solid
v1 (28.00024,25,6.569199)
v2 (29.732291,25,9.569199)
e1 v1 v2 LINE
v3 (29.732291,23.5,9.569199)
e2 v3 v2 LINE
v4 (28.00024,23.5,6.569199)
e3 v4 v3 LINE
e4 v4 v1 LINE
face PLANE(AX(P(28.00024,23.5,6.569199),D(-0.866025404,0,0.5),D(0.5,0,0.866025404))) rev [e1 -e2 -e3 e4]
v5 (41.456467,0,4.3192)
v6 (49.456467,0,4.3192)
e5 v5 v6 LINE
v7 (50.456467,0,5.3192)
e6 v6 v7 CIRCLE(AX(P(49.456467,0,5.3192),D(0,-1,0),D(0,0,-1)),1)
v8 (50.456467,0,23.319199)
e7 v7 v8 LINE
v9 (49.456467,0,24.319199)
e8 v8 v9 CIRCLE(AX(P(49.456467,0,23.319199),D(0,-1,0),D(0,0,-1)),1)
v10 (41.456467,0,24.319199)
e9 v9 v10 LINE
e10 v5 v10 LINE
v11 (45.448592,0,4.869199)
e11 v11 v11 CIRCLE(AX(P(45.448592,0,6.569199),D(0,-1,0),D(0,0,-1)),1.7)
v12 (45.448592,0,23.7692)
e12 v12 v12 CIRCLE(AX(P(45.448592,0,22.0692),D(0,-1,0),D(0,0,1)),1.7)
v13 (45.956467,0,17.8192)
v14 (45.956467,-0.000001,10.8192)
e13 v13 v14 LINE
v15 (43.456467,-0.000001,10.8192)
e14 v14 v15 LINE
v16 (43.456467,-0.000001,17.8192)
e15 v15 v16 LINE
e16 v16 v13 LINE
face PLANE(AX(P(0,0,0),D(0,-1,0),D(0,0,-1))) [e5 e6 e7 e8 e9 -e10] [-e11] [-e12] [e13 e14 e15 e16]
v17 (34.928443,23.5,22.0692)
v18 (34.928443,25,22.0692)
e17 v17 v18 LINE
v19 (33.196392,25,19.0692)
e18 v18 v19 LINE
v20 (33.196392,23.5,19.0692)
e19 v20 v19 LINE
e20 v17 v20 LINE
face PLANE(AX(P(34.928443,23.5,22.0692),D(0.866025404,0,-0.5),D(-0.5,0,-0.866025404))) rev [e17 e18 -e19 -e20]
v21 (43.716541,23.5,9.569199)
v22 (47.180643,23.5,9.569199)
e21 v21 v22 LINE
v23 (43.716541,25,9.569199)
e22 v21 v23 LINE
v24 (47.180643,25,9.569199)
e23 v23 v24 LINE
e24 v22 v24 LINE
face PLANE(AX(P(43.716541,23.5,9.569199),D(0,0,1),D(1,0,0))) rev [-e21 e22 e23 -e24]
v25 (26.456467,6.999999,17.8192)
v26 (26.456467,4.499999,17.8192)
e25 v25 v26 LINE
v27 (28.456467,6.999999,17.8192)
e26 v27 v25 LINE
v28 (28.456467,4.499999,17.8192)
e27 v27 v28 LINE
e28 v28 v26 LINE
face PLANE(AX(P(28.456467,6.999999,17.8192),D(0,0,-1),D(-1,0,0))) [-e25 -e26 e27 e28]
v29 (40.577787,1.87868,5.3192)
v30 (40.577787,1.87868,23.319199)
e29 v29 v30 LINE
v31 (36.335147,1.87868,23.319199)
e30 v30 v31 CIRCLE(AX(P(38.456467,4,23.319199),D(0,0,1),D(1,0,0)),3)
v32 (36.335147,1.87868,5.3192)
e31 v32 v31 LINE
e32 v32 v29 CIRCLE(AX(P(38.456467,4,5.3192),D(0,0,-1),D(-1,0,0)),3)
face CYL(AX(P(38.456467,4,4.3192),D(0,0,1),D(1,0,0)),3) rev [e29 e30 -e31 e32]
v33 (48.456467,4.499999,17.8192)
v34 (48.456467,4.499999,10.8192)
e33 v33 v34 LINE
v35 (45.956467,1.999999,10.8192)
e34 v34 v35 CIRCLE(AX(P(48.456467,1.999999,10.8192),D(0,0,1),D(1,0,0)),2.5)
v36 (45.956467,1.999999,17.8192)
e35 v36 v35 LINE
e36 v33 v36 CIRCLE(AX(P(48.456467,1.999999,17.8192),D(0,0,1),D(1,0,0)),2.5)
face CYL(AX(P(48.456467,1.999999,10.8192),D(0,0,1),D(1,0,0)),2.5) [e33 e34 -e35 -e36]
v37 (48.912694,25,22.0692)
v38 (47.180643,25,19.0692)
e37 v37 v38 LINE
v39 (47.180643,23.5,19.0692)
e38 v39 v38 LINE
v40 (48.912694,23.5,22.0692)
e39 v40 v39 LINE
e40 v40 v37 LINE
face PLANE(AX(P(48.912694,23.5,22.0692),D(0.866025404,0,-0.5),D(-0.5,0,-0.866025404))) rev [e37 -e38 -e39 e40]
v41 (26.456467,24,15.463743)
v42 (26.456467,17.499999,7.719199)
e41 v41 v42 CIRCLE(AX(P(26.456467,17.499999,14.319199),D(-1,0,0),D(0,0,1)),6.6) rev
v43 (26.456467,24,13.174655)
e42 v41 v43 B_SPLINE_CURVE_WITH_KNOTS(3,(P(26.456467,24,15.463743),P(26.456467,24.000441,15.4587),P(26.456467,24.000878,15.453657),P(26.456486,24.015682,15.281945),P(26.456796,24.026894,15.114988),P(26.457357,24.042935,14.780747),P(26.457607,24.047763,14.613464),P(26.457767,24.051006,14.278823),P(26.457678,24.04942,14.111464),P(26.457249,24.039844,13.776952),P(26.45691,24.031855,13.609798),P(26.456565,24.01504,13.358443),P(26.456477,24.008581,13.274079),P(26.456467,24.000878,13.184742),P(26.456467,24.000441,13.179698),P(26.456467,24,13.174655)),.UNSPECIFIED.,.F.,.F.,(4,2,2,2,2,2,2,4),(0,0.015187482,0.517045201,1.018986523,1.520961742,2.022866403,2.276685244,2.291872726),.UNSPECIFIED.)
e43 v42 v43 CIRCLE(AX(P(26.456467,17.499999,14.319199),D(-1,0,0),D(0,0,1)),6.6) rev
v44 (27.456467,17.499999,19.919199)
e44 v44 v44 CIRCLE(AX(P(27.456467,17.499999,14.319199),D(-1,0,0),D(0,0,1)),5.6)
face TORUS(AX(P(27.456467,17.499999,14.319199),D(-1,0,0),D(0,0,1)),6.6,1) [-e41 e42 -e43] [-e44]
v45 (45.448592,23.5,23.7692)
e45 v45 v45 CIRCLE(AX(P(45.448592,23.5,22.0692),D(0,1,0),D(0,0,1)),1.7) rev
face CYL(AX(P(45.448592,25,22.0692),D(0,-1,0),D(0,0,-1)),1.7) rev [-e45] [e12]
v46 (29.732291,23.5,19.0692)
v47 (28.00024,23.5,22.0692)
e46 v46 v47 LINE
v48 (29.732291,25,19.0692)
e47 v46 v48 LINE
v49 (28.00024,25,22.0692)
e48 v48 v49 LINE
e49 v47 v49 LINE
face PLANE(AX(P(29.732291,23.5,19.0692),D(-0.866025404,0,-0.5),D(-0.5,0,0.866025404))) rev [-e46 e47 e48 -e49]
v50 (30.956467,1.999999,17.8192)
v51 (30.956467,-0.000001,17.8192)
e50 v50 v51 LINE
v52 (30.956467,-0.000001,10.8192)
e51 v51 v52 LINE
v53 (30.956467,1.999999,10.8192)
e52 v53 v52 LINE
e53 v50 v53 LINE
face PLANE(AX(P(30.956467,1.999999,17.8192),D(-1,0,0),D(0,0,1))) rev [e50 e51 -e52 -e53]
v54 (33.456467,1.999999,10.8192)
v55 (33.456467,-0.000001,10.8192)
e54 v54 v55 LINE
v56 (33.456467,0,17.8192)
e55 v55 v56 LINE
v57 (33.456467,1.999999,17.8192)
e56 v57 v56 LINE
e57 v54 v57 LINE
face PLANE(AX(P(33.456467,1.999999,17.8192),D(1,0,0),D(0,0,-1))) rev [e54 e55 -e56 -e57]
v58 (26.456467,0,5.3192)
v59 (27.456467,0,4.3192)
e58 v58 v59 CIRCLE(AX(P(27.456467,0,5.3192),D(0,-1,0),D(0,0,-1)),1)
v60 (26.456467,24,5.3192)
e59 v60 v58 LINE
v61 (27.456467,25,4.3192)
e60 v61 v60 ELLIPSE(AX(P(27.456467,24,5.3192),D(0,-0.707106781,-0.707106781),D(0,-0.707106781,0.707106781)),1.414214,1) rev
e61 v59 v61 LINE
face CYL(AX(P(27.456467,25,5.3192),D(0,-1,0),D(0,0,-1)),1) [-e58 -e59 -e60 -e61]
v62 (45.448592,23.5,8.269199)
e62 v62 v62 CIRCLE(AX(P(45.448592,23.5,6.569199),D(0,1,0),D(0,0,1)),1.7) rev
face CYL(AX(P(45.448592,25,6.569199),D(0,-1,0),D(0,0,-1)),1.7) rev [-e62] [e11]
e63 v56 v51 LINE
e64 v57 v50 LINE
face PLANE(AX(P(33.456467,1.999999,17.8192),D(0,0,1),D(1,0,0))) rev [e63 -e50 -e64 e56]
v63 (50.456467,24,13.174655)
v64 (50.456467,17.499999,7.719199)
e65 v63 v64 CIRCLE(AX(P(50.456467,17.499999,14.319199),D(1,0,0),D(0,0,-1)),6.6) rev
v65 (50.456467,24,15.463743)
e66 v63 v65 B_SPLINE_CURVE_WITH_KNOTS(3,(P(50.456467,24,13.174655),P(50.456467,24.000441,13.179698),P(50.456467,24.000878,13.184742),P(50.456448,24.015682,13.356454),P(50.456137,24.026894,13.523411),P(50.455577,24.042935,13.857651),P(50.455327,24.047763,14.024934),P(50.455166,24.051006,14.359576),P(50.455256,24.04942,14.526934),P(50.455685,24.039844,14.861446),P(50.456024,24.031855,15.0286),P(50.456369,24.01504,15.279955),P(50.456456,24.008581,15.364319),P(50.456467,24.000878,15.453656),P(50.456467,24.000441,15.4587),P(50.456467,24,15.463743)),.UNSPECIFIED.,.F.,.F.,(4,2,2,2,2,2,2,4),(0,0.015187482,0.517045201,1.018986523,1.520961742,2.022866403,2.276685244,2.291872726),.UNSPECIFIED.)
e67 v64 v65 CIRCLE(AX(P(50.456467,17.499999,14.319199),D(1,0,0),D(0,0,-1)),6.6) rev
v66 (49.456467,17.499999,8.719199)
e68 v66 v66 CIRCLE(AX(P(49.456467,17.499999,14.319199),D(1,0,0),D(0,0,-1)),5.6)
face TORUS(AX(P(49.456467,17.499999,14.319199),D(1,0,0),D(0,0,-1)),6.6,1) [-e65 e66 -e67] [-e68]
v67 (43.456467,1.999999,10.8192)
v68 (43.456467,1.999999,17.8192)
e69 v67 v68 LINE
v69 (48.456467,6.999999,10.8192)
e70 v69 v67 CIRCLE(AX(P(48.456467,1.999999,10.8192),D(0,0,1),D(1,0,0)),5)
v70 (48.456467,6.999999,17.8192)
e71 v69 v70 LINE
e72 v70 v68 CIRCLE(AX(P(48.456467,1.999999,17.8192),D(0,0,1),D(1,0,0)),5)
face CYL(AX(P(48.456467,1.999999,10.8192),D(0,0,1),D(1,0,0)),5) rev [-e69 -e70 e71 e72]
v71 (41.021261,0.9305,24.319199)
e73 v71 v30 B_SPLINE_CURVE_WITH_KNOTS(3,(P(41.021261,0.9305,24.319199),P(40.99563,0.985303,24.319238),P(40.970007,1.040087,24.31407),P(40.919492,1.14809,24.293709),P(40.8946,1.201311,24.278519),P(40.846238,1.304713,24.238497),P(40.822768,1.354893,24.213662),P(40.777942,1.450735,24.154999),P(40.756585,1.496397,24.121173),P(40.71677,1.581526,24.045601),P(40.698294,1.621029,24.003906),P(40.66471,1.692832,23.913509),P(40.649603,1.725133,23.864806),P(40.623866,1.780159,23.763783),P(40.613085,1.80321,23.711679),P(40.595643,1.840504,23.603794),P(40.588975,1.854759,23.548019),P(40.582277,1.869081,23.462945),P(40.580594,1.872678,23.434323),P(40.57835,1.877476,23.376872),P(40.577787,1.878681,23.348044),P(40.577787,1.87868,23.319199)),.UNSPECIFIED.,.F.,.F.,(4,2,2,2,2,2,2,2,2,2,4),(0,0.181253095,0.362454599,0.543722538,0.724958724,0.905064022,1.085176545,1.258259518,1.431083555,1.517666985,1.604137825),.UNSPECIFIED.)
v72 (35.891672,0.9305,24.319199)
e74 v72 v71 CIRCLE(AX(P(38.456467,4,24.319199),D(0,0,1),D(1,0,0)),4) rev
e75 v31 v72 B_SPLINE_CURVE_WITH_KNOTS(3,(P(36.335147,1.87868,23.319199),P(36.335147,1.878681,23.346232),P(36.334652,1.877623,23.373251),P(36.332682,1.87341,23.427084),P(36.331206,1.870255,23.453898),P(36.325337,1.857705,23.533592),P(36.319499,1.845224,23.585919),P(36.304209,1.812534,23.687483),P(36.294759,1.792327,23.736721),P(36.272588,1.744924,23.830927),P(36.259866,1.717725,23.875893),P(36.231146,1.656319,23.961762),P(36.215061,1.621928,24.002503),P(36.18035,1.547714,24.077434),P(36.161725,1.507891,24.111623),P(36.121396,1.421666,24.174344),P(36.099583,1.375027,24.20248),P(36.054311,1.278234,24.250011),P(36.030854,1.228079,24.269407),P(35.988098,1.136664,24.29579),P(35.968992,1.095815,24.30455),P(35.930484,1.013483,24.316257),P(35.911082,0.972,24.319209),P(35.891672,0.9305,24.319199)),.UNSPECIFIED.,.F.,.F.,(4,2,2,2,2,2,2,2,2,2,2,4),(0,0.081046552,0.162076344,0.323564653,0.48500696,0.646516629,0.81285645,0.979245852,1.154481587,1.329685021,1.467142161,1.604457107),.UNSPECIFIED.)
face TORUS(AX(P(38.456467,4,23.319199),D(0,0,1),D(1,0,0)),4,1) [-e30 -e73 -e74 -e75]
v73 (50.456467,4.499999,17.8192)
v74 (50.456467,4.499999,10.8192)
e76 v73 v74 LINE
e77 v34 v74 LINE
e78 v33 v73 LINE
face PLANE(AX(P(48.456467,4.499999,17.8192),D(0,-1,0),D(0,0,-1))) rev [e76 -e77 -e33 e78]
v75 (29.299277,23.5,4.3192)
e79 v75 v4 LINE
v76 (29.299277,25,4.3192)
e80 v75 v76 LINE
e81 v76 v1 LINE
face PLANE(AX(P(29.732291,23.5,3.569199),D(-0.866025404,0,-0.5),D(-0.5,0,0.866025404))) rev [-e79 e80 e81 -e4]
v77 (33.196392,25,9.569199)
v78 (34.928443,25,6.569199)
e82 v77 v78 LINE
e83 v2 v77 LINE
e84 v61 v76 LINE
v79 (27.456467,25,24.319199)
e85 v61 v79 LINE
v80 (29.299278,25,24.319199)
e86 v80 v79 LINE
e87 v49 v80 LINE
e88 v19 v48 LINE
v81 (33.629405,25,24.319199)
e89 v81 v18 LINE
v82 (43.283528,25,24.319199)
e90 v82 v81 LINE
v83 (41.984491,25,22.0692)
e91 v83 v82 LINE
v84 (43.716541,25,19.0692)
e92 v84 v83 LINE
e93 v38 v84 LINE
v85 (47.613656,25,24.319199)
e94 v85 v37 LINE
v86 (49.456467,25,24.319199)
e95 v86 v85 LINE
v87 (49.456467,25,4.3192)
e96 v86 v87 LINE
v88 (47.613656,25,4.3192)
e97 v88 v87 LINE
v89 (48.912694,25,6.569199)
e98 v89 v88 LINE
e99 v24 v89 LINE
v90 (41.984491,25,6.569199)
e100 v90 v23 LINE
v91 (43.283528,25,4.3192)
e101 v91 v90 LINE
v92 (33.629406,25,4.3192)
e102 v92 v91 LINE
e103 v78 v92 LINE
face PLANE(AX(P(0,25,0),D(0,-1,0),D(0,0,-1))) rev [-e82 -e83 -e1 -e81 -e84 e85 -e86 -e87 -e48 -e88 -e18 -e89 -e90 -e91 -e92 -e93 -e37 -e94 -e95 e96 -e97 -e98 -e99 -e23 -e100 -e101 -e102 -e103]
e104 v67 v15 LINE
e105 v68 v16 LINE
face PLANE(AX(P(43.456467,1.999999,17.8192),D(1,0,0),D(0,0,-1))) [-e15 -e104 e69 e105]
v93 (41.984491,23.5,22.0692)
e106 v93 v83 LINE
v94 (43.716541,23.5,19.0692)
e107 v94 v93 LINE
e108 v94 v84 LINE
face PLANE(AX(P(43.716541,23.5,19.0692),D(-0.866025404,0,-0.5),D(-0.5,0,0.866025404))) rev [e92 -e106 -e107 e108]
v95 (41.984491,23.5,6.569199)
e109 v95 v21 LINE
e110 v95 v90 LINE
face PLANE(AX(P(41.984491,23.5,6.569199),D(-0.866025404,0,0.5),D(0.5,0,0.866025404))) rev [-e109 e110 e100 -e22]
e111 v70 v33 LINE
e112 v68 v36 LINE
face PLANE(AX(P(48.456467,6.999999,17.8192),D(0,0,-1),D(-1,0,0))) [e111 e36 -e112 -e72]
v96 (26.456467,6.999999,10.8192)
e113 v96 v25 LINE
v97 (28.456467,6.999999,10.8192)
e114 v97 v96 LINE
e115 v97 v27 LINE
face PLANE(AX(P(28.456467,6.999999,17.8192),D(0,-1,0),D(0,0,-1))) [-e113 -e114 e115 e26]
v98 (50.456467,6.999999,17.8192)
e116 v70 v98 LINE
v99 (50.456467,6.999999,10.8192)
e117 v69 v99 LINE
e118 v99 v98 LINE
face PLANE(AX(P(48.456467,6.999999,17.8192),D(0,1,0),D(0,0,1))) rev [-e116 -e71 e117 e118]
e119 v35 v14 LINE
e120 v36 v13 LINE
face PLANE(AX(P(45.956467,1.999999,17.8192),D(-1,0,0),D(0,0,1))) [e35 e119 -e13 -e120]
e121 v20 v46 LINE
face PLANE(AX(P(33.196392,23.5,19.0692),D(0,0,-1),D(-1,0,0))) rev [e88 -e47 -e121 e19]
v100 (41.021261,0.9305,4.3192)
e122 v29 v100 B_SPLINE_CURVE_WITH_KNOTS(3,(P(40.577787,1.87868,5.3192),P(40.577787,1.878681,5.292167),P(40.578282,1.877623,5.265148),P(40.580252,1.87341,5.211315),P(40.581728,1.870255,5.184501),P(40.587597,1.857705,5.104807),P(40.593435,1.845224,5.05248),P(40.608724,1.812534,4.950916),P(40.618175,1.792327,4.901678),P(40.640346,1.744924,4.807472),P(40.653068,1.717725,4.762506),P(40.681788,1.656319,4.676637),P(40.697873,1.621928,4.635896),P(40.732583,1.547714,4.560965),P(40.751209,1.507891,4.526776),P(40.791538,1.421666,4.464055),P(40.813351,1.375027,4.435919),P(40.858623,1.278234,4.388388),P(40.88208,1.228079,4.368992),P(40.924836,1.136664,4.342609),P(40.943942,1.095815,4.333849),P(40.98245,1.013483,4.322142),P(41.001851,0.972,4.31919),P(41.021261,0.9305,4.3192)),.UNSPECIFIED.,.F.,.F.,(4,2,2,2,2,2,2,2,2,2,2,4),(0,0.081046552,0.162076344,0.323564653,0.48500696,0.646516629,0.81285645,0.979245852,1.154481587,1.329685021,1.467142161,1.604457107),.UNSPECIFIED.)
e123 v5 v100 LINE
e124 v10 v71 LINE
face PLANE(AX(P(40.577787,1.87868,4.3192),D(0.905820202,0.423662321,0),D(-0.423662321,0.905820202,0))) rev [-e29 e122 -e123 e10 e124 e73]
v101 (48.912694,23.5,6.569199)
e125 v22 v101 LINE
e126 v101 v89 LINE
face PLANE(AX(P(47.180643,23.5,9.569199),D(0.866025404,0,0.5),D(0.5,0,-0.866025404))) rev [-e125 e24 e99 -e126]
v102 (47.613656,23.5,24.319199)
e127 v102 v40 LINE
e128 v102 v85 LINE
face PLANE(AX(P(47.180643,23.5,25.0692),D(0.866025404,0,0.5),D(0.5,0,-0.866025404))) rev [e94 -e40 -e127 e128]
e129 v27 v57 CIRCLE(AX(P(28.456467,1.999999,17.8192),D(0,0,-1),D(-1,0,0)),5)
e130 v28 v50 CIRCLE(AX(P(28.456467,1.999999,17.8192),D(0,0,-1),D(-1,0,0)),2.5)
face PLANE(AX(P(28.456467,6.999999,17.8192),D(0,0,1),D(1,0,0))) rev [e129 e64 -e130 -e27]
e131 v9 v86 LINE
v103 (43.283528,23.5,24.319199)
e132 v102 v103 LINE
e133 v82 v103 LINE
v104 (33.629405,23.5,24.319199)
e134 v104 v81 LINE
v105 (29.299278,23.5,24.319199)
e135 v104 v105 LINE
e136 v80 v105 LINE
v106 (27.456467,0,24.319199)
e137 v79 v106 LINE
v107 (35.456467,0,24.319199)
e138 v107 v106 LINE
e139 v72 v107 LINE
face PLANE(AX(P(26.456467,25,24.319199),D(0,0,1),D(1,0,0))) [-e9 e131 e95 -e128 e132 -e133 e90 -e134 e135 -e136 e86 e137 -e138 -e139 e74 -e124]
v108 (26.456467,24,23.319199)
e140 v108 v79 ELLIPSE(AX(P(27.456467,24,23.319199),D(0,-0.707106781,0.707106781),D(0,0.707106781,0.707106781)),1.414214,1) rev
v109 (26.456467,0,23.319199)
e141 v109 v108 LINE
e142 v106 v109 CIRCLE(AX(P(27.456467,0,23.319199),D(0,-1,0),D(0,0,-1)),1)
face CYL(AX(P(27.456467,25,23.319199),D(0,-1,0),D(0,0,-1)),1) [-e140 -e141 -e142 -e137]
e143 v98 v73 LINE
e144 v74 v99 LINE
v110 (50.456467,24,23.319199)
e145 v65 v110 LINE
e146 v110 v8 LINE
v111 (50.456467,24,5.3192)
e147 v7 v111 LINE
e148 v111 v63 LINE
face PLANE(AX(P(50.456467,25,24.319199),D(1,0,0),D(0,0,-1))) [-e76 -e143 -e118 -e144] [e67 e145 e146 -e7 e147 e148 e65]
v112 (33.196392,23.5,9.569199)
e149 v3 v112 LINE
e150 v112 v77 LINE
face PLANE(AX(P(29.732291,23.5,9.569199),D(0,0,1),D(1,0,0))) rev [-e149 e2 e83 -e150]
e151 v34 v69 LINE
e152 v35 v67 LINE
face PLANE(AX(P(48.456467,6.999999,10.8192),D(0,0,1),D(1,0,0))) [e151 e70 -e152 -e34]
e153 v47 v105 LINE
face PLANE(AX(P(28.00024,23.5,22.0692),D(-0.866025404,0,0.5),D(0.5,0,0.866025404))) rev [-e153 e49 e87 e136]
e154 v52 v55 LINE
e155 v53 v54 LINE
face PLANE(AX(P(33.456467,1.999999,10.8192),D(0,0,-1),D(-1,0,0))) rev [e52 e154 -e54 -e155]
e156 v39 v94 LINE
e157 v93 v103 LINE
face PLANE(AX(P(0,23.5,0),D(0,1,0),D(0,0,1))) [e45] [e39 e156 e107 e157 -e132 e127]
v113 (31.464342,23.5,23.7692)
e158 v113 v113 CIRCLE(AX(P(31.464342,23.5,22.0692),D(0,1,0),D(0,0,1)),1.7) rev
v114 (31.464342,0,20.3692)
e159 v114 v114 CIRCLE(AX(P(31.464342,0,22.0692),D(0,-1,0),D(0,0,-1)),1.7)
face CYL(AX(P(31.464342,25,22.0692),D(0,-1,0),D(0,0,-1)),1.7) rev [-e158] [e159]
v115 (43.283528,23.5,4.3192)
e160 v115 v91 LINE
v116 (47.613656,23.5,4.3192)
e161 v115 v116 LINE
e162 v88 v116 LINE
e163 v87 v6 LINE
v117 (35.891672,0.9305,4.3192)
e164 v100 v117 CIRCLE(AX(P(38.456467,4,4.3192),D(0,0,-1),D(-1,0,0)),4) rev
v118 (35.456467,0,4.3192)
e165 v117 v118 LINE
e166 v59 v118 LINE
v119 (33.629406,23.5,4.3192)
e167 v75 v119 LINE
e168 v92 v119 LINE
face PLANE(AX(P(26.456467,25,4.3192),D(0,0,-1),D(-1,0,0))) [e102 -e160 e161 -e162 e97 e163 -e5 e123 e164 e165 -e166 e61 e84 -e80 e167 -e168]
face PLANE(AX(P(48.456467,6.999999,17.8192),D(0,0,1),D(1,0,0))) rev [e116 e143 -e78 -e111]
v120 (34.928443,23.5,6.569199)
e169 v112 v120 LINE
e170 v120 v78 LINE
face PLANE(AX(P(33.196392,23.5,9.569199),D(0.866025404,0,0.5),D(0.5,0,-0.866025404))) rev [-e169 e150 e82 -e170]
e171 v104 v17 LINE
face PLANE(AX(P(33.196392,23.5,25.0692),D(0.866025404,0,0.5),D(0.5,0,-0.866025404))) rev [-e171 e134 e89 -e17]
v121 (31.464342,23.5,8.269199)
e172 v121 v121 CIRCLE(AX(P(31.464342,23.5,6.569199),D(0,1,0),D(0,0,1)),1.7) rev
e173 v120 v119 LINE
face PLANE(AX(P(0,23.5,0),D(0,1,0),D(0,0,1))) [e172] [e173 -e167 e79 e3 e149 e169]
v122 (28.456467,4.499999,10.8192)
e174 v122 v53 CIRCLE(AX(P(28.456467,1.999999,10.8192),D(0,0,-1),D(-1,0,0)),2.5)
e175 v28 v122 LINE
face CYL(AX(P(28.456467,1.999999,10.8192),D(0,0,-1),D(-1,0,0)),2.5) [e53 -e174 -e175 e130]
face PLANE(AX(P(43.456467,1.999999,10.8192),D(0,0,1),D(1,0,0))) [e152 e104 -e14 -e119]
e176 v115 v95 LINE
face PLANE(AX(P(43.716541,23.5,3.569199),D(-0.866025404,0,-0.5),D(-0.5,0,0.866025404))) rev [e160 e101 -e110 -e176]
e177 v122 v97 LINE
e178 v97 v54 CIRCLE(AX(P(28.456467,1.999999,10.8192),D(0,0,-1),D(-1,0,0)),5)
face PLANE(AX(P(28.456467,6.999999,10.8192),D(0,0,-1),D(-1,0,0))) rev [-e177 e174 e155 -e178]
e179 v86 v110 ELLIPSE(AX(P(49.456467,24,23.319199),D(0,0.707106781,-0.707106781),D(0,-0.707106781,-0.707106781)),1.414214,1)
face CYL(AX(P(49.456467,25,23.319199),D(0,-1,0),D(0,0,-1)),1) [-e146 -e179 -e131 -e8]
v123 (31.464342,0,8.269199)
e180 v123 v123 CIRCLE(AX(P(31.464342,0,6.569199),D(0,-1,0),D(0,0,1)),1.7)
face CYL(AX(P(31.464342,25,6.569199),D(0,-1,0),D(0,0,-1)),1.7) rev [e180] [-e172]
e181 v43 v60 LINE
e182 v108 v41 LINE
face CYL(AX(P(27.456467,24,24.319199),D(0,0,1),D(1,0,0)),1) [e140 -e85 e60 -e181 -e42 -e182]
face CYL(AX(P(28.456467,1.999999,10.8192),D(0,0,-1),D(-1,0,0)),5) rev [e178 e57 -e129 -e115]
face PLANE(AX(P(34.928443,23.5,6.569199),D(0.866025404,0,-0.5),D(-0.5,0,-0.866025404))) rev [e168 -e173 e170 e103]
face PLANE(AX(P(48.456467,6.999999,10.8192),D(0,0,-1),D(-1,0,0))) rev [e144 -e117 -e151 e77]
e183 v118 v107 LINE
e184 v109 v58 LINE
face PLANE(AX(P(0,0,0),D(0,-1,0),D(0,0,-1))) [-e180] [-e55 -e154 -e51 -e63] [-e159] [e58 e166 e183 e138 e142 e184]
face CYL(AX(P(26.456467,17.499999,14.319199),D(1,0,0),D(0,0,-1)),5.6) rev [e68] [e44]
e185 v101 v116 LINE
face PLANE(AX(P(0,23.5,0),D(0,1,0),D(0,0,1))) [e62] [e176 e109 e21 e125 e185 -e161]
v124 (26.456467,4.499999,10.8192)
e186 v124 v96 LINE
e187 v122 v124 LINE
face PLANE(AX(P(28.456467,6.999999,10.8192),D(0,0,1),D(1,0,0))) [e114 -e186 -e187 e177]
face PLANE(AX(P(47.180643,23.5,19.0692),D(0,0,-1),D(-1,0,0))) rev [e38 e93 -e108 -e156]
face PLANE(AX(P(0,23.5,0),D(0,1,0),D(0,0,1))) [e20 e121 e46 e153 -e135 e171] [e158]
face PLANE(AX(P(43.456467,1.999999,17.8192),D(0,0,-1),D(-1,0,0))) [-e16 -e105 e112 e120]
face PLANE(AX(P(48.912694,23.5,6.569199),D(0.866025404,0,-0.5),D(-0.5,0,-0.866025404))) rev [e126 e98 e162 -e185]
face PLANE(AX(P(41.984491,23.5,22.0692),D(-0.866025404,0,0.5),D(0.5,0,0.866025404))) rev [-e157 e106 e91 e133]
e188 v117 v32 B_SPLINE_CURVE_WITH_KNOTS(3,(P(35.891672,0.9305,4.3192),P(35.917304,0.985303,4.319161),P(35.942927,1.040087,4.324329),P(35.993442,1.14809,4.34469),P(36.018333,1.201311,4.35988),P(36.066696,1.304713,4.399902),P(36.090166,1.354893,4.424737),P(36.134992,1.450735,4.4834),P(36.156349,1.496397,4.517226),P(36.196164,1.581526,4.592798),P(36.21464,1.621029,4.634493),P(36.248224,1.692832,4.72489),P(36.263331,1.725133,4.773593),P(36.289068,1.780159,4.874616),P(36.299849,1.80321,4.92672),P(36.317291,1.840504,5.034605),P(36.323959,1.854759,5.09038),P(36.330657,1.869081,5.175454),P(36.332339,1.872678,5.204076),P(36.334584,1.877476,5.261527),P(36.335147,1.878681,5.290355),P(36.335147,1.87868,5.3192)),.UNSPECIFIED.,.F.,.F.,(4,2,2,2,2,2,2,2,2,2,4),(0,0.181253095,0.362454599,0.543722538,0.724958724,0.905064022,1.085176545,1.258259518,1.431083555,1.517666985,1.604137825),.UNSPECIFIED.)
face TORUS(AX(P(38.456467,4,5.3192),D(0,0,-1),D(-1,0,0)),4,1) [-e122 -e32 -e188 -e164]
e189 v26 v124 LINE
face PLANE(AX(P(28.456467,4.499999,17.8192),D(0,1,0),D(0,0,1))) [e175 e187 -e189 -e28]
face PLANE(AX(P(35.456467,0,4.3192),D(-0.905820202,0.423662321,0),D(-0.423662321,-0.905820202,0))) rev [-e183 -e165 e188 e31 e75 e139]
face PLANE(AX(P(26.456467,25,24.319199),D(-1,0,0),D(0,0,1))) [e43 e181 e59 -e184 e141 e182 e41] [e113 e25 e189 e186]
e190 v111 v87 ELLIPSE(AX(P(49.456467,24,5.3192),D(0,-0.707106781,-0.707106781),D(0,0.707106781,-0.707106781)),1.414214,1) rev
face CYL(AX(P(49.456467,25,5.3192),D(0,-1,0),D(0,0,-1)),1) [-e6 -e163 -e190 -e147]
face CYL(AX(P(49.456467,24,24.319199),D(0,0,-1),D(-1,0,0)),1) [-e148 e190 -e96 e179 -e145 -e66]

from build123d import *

# Parameters (mm, degrees)
CROQUIS1_W              = 23.999999999999773
CROQUIS1_H              = 19.99999938803319
SALIENTE_EXTRUIR1_DEPTH = 25
CORTAR_EXTRUIR1_DEPTH   = 60.75663166018996
CROQUIS3_R              = 5.599999999999993
CORTAR_EXTRUIR2_DEPTH   = 43.33702219441687
CROQUIS4_R              = 1.6999999999999995
CORTAR_EXTRUIR3_DEPTH   = 62.33741517329244
CROQUIS8_W              = 7.000000000000005
CROQUIS8_H              = 2.499999999999975
CORTAR_EXTRUIR7_DEPTH   = 1.5
REDONDEO1_R             = 1


with BuildPart() as part:
    # Croquis1 → Saliente-Extruir1 (new body)
    with BuildSketch(Plane.XZ):
        with Locations((38.456466898211374, 14.319199476403412)):
            Rectangle(CROQUIS1_W, CROQUIS1_H)
    extrude(amount=-SALIENTE_EXTRUIR1_DEPTH)

    # Croquis2 → Cortar-Extruir1 (cut, through all)
    with BuildSketch(Plane.XY.offset(24.319199170420006)):
        with BuildLine():
            Line((35.456466898211275, 0), (36.335146554651615, 1.8786796564403407))
            ThreePointArc((36.335146554651615, 1.8786796564403407), (38.45646689821126, 7.00000000000005), (40.57778724177091, 1.8786796564403407))
            Line((40.57778724177091, 1.8786796564403407), (41.45646689821126, 0))
            Line((41.45646689821126, 0), (35.456466898211275, 0))
        make_face()
    extrude(amount=-CORTAR_EXTRUIR1_DEPTH, mode=Mode.SUBTRACT)

    # Croquis3 → Cortar-Extruir2 (cut, through all)
    with BuildSketch(Plane(origin=(50.45646689821126, 0, 0), x_dir=(0, 0, -1), z_dir=(1, 0, 0))):
        with Locations((-14.319199170420013, 17.499998559923498)):
            Circle(CROQUIS3_R)
    extrude(amount=-CORTAR_EXTRUIR2_DEPTH, mode=Mode.SUBTRACT)

    # Croquis4 → Cortar-Extruir3 (cut, through all)
    with BuildSketch(Plane.XZ):
        with Locations(Location((31.464341614174252, 22.06919978238682, 0), (0, 0, 270))):
            Circle(CROQUIS4_R)
        with Locations(Location((45.448592182248724, 22.06919978238682, 0), (0, 0, 90))):
            Circle(CROQUIS4_R)
        with Locations(Location((45.448592182248724, 6.5691985584531984, 0), (0, 0, 270))):
            Circle(CROQUIS4_R)
        with Locations(Location((31.464341614174252, 6.569198558453197, 0), (0, 0, 90))):
            Circle(CROQUIS4_R)
    extrude(amount=-CORTAR_EXTRUIR3_DEPTH, mode=Mode.SUBTRACT)

    # Cortar-Barrer2: sweep along a path in Croquis9
    with BuildLine(Plane(origin=(0, 0, 10.819199782386816), x_dir=(-1, 0, 0), z_dir=(0, 0, -1))) as cortar_barrer2_path:
        Line((-50.45646689821126, 6.999998762857437), (-48.45646689821129, 6.999998762857437))
        ThreePointArc((-48.45646689821129, 6.999998762857437), (-44.92093299227851, 5.5355326687901805), (-43.45646689821125, 1.9999987628574059))
        Line((-43.45646689821125, 1.9999987628574059), (-43.45646689821125, -1.23714255593e-06))
    # Croquis8 → Cortar-Barrer2 (sweep, cut)
    with BuildSketch(Plane(origin=(50.45646689821126, 0, 0), x_dir=(0, 0, -1), z_dir=(1, 0, 0))):
        with Locations((-14.319199782386818, 5.749998762857451)):
            Rectangle(CROQUIS8_W, CROQUIS8_H)
    cortar_barrer2 = sweep(path=cortar_barrer2_path.line, mode=Mode.SUBTRACT)

    # Simetría1: Cortar-Barrer2 across plane
    add(cortar_barrer2.mirror(Plane(origin=(38.45646689821126, 0, 0), x_dir=(0, 0, 1), z_dir=(1, 0, 0))), mode=Mode.SUBTRACT)

    # Croquis11 → Cortar-Extruir7 (cut)
    with BuildSketch(Plane(origin=(0, 25, 0), x_dir=(1, 0, 0), z_dir=(0, 1, 0))):
        Polygon((47.180642989817585, -19.069199782386846), (43.716541374679856, -19.069199782386846), (41.98449056711099, -22.06919978238682), (43.716541374679856, -25.0691997823868), (47.180642989817585, -25.0691997823868), (48.91269379738645, -22.06919978238682), align=None)
        Polygon((34.928443229312, -22.06919978238682), (33.196392421743134, -19.069199782386825), (29.732290806605373, -19.069199782386825), (28.000239999036502, -22.06919978238682), (29.73229080660538, -25.069199782386818), (33.19639242174313, -25.069199782386814), align=None)
        Polygon((34.928443229312016, -6.569198558453194), (33.196392421743134, -3.569198558453189), (29.732290806605366, -3.56919855845319), (28.000239999036484, -6.569198558453203), (29.732290806605363, -9.569198558453209), (33.196392421743134, -9.569198558453209), align=None)
        Polygon((47.18064298981763, -9.569198558453236), (48.91269379738652, -6.569198558453209), (47.18064298981762, -3.5691985584531754), (43.716541374679835, -3.5691985584531754), (41.98449056711095, -6.569198558453195), (43.71654137467985, -9.569198558453236), align=None)
    extrude(amount=-CORTAR_EXTRUIR7_DEPTH, mode=Mode.SUBTRACT)

    # Redondeo1
    # the kernel refuses this fillet: 1 mm, written as the material it takes off along each edge
    with BuildSketch(Plane(origin=(50.45646689821126, 25, 26.819199170420006), x_dir=(0, -1, 0), z_dir=(0, 0, -1))) as redondeo1_piece_1:
        with BuildLine():
            CenterArc((REDONDEO1_R, REDONDEO1_R), REDONDEO1_R, 180, 90)
            Line((0, REDONDEO1_R), (0, 0))
            Line((0, 0), (REDONDEO1_R, 0))
        make_face()
    extrude(amount=24.99999938803319, mode=Mode.SUBTRACT)
    with BuildSketch(Plane(origin=(38.45646689821127, 4.000000000000019, 4.319199782386818), x_dir=(0.003141587485877974, -0.9999950652018582, 0), z_dir=(-0.9999950652018582, -0.003141587485877974, 0))) as redondeo1_piece_2:
        with BuildLine():
            CenterArc((3.0000000000000306 + REDONDEO1_R, REDONDEO1_R), REDONDEO1_R, 180, 90)
            Line((3.0000000000000306 + REDONDEO1_R, 0), (3.0000000000000306, 0))
            Line((3.0000000000000306, 0), (3.0000000000000306, REDONDEO1_R))
        make_face()
    revolve(axis=Axis((38.45646689821127, 4.000000000000019, 4.319199782386818), (0, 0, 1)), revolution_arc=359.64, mode=Mode.SUBTRACT)
    with BuildSketch(Plane(origin=(38.45646689821127, 4.000000000000019, 24.319199170420006), x_dir=(-0.0031415874858803424, -0.9999950652018582, 0), z_dir=(0.9999950652018582, -0.0031415874858803424, 0))) as redondeo1_piece_3:
        with BuildLine():
            CenterArc((3.0000000000000298 + REDONDEO1_R, REDONDEO1_R), REDONDEO1_R, 180, 90)
            Line((3.0000000000000298, REDONDEO1_R), (3.0000000000000298, 0))
            Line((3.0000000000000298, 0), (3.0000000000000298 + REDONDEO1_R, 0))
        make_face()
    revolve(axis=Axis((38.45646689821127, 4.000000000000019, 24.319199170420006), (0, 0, -1)), revolution_arc=359.64000000000004, mode=Mode.SUBTRACT)
    with BuildSketch(Plane(origin=(26.456466898211488, 17.499998559923498, 14.319199170420013), x_dir=(0, 0, -1), z_dir=(0, -1, 0))) as redondeo1_piece_4:
        with BuildLine():
            CenterArc((5.599999999999994 + REDONDEO1_R, REDONDEO1_R), REDONDEO1_R, 180, 90)
            Line((5.599999999999994, REDONDEO1_R), (5.599999999999994, 0))
            Line((5.599999999999994, 0), (5.599999999999994 + REDONDEO1_R, 0))
        make_face()
    revolve(axis=Axis((26.456466898211488, 17.499998559923498, 14.319199170420013), (1, 0, 0)), mode=Mode.SUBTRACT)
    with BuildSketch(Plane(origin=(50.45646689821126, 17.499998559923498, 14.319199170420013), x_dir=(0, 0, -1), z_dir=(0, -1, 0))) as redondeo1_piece_5:
        with BuildLine():
            CenterArc((5.599999999999994 + REDONDEO1_R, -REDONDEO1_R), REDONDEO1_R, 90, 90)
            Line((5.599999999999994, -REDONDEO1_R), (5.599999999999994, 0))
            Line((5.599999999999994, 0), (5.599999999999994 + REDONDEO1_R, 0))
        make_face()
    revolve(axis=Axis((50.45646689821126, 17.499998559923498, 14.319199170420013), (1, 0, 0)), mode=Mode.SUBTRACT)
    with BuildSketch(Plane(origin=(26.456466898211488, 25, 1.8191997823868178), x_dir=(1, 0, 0), z_dir=(0, 0, 1))) as redondeo1_piece_6:
        with BuildLine():
            CenterArc((REDONDEO1_R, -REDONDEO1_R), REDONDEO1_R, 90, 90)
            Line((0, -REDONDEO1_R), (0, 0))
            Line((0, 0), (REDONDEO1_R, 0))
        make_face()
    extrude(amount=24.99999938803319, mode=Mode.SUBTRACT)
    with BuildSketch(Plane(origin=(26.456466898211488, -2.5, 24.319199170420006), x_dir=(1, 0, 0), z_dir=(0, 1, 0))) as redondeo1_piece_7:
        with BuildLine():
            CenterArc((REDONDEO1_R, REDONDEO1_R), REDONDEO1_R, 180, 90)
            Line((0, REDONDEO1_R), (0, 0))
            Line((0, 0), (REDONDEO1_R, 0))
        make_face()
    extrude(amount=30.000000000000004, mode=Mode.SUBTRACT)
    with BuildSketch(Plane(origin=(50.45646689821126, -2.5, 24.319199170420006), x_dir=(-1, 0, 0), z_dir=(0, 1, 0))) as redondeo1_piece_8:
        with BuildLine():
            CenterArc((REDONDEO1_R, -REDONDEO1_R), REDONDEO1_R, 90, 90)
            Line((0, -REDONDEO1_R), (0, 0))
            Line((0, 0), (REDONDEO1_R, 0))
        make_face()
    extrude(amount=30.000000000000004, mode=Mode.SUBTRACT)
    with BuildSketch(Plane(origin=(50.45646689821126, -2.5, 4.319199782386818), x_dir=(0, 0, 1), z_dir=(0, 1, 0))) as redondeo1_piece_9:
        with BuildLine():
            CenterArc((REDONDEO1_R, -REDONDEO1_R), REDONDEO1_R, 90, 90)
            Line((0, -REDONDEO1_R), (0, 0))
            Line((0, 0), (REDONDEO1_R, 0))
        make_face()
    extrude(amount=30.000000000000004, mode=Mode.SUBTRACT)
    with BuildSketch(Plane(origin=(26.456466898211488, -2.5, 4.319199782386818), x_dir=(0, 0, 1), z_dir=(0, 1, 0))) as redondeo1_piece_10:
        with BuildLine():
            CenterArc((REDONDEO1_R, REDONDEO1_R), REDONDEO1_R, 180, 90)
            Line((0, REDONDEO1_R), (0, 0))
            Line((0, 0), (REDONDEO1_R, 0))
        make_face()
    extrude(amount=30.000000000000004, mode=Mode.SUBTRACT)


solid = part.part
